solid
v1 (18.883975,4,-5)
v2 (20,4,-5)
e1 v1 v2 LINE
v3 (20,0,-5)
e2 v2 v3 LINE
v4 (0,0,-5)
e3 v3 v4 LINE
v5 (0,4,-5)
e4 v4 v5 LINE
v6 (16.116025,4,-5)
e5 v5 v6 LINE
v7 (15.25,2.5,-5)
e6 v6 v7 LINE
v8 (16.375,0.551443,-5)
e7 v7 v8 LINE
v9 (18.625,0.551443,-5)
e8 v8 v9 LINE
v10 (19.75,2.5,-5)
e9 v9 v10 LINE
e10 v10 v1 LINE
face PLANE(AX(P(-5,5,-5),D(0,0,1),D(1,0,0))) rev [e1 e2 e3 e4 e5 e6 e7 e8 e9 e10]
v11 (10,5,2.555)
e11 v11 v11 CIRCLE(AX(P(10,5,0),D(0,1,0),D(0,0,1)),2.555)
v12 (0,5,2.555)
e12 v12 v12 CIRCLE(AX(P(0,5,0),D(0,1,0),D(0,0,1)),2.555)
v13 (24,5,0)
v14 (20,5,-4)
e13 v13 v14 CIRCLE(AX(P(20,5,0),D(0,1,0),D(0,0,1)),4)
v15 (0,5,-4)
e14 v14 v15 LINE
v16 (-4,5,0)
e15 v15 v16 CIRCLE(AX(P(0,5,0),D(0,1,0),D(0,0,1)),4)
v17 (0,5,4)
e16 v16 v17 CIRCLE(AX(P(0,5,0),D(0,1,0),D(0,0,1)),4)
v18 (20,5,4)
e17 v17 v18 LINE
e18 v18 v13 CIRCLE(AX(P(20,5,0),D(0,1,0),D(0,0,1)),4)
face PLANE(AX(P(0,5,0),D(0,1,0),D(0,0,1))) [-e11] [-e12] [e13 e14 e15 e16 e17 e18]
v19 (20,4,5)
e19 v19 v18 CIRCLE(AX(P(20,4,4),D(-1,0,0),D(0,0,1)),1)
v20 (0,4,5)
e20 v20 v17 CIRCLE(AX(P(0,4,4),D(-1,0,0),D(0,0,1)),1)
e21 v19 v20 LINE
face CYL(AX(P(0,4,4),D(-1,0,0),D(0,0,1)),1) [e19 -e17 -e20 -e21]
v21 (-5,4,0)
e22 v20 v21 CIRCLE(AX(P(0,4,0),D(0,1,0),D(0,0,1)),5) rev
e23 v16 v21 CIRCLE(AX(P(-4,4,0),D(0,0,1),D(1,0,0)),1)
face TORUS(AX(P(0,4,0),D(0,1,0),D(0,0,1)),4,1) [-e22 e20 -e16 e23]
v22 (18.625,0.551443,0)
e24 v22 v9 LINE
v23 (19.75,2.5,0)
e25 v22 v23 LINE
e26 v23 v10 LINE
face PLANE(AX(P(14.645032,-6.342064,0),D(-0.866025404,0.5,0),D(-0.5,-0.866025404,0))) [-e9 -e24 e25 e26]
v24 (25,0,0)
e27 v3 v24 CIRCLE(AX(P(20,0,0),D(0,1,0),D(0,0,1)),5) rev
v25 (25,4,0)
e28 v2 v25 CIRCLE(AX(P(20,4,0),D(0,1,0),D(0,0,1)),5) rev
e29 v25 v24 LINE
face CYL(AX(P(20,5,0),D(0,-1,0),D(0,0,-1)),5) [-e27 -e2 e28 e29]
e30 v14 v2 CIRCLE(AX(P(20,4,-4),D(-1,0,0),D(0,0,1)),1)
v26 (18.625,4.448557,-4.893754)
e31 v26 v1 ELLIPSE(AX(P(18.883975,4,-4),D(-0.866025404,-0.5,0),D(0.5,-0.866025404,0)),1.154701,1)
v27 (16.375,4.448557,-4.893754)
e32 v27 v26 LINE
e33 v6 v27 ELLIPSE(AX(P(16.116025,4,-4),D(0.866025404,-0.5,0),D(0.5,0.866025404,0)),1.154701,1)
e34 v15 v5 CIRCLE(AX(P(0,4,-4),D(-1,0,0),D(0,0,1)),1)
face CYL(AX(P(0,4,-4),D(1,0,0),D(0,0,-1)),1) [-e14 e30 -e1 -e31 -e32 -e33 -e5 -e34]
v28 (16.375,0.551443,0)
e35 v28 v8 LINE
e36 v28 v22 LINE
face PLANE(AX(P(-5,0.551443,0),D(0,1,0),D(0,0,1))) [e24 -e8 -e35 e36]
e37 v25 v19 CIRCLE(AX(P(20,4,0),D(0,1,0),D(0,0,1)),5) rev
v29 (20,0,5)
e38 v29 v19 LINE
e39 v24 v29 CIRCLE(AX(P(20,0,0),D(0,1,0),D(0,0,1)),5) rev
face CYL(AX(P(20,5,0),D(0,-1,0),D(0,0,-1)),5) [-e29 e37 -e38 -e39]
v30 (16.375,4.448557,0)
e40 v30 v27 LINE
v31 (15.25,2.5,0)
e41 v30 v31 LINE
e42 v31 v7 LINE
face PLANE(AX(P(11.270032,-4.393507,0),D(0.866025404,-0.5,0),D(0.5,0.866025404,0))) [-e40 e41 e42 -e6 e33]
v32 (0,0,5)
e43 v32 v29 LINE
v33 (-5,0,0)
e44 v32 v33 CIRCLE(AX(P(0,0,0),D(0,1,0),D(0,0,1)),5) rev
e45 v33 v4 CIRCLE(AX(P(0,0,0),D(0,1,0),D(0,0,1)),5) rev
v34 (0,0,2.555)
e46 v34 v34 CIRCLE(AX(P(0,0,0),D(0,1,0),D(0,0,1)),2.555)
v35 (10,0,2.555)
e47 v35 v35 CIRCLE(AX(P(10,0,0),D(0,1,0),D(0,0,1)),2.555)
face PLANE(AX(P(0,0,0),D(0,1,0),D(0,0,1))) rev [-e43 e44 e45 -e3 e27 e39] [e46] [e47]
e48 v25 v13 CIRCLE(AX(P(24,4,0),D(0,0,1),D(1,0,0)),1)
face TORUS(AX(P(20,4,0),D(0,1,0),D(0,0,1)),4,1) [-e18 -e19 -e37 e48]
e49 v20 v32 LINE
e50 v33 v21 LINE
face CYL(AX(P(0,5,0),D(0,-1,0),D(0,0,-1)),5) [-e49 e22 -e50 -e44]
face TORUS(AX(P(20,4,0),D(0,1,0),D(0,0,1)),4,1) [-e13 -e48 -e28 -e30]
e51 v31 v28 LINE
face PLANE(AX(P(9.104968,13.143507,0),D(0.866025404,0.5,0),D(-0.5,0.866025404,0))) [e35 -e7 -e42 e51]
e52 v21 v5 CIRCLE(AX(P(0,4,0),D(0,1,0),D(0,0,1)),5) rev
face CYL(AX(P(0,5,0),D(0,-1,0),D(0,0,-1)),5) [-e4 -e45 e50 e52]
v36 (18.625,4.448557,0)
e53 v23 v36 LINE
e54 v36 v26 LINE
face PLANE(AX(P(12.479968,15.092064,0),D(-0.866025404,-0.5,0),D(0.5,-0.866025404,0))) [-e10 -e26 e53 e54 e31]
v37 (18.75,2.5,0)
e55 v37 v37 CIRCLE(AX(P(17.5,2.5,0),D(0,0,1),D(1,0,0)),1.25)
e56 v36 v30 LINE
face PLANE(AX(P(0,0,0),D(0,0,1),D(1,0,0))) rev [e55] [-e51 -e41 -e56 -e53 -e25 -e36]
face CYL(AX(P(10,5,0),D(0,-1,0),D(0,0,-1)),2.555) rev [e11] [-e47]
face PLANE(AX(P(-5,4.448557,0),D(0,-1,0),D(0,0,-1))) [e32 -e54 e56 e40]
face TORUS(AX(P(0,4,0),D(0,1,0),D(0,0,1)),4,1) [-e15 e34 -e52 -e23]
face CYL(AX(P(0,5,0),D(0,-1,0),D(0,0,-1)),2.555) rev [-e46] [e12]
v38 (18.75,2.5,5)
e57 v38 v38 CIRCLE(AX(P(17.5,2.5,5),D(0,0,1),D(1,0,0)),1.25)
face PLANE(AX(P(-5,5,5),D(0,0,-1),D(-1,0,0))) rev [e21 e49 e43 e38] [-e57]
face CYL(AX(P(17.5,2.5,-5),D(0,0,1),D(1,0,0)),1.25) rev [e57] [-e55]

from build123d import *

# Parameters (mm, degrees)
SKETCH1_W           = 30
SKETCH1_H           = 10
SKETCH1_R           = 2.555
BOSS_EXTRUDE1_DEPTH = 5
SKETCH2_R           = 1.25
CUT_EXTRUDE1_DEPTH  = 28.386127875
CUT_EXTRUDE2_START  = -5
SKETCH2_3_R         = 1.25
CUT_EXTRUDE2_DEPTH  = 5
FILLET1_R           = 5
FILLET2_R           = 1


# Some blends are built 0.0001 mm under size
with BuildPart() as part:
    # Sketch1 → Boss-Extrude1 (new body)
    with BuildSketch(Plane(origin=(0, 0, 0), x_dir=(1, 0, 0), z_dir=(0, 1, 0))):
        with Locations((10, 0)):
            Rectangle(SKETCH1_W, SKETCH1_H)
        with Locations(Location((0, 0, 0), (0, 0, 270))):
            Circle(SKETCH1_R, mode=Mode.SUBTRACT)
        with Locations(Location((10, 0, 0), (0, 0, 270))):
            Circle(SKETCH1_R, mode=Mode.SUBTRACT)
    extrude(amount=BOSS_EXTRUDE1_DEPTH)

    # Sketch2 → Cut-Extrude1 (cut, through all)
    with BuildSketch(Plane.XY.offset(5)):
        with Locations((17.5, 2.5)):
            Circle(SKETCH2_R)
    extrude(amount=-CUT_EXTRUDE1_DEPTH, mode=Mode.SUBTRACT)

    # Sketch2<3> → Cut-Extrude2 (cut)
    with BuildSketch(Plane.XY.offset(5).offset(CUT_EXTRUDE2_START)):
        Polygon((18.625, 4.448557159), (16.375, 4.448557159), (15.25, 2.5), (16.375, 0.551442841), (18.625, 0.551442841), (19.75, 2.5), align=None)
        with Locations((17.5, 2.5)):
            Circle(SKETCH2_3_R, mode=Mode.SUBTRACT)
    extrude(amount=-CUT_EXTRUDE2_DEPTH, mode=Mode.SUBTRACT)

    # Fillet1
    fillet1_edges = [part.edges().sort_by_distance(p)[0] for p in [
        (-5, 2.5, -5),
        (-5, 2.5, 5),
        (25, 2.5, -5),
        (25, 2.5, 5),
    ]]
    fillet(fillet1_edges, radius=FILLET1_R - 0.0001)  # a hair under: the kernel refuses the full size

    # Fillet2
    # the kernel refuses this fillet: 1 mm, written as the material it takes off along each edge
    with BuildSketch(Plane(origin=(-0.0001, 5, 0.0001), x_dir=(-1, 0, 0), z_dir=(0, 0, -1))) as fillet2_piece_1:
        with BuildLine():
            CenterArc((4.9999 - FILLET2_R, -FILLET2_R), FILLET2_R, 0, 90)
            Line((4.9999, -FILLET2_R), (4.9999, 0))
            Line((4.9999, 0), (4.9999 - FILLET2_R, 0))
        make_face()
    revolve(axis=Axis((-0.0001, 5, 0.0001), (0, 1, 0)), revolution_arc=90, mode=Mode.SUBTRACT)
    with BuildSketch(Plane(origin=(-0.0001, 5, -0.0001), x_dir=(0, 0, -1), z_dir=(1, 0, 0))) as fillet2_piece_2:
        with BuildLine():
            CenterArc((4.9999 - FILLET2_R, -FILLET2_R), FILLET2_R, 0, 90)
            Line((4.9999 - FILLET2_R, 0), (4.9999, 0))
            Line((4.9999, 0), (4.9999, -FILLET2_R))
        make_face()
    revolve(axis=Axis((-0.0001, 5, -0.0001), (0, 1, 0)), revolution_arc=90, mode=Mode.SUBTRACT)
    with BuildSketch(Plane(origin=(-0.0001, 5, -5), x_dir=(0, -1, 0), z_dir=(1, 0, 0))) as fillet2_piece_3:
        with BuildLine():
            CenterArc((FILLET2_R, -FILLET2_R), FILLET2_R, 90, 90)
            Line((0, -FILLET2_R), (0, 0))
            Line((0, 0), (FILLET2_R, 0))
        make_face()
    extrude(amount=20.0002, mode=Mode.SUBTRACT)
    with BuildSketch(Plane(origin=(20.0001, 5, -0.0001), x_dir=(0, 0, -1), z_dir=(-1, 0, 0))) as fillet2_piece_4:
        with BuildLine():
            CenterArc((4.9999 - FILLET2_R, FILLET2_R), FILLET2_R, 270, 90)
            Line((4.9999 - FILLET2_R, 0), (4.9999, 0))
            Line((4.9999, 0), (4.9999, FILLET2_R))
        make_face()
    revolve(axis=Axis((20.0001, 5, -0.0001), (0, -1, 0)), revolution_arc=90, mode=Mode.SUBTRACT)
    with BuildSketch(Plane(origin=(20.0001, 5, 0.0001), x_dir=(1, 0, 0), z_dir=(0, 0, -1))) as fillet2_piece_5:
        with BuildLine():
            CenterArc((4.9999 - FILLET2_R, FILLET2_R), FILLET2_R, 270, 90)
            Line((4.9999, FILLET2_R), (4.9999, 0))
            Line((4.9999, 0), (4.9999 - FILLET2_R, 0))
        make_face()
    revolve(axis=Axis((20.0001, 5, 0.0001), (0, -1, 0)), revolution_arc=90, mode=Mode.SUBTRACT)
    with BuildSketch(Plane(origin=(20.0001, 5, 5), x_dir=(0, 0, -1), z_dir=(-1, 0, 0))) as fillet2_piece_6:
        with BuildLine():
            CenterArc((FILLET2_R, FILLET2_R), FILLET2_R, 180, 90)
            Line((0, FILLET2_R), (0, 0))
            Line((0, 0), (FILLET2_R, 0))
        make_face()
    extrude(amount=20.0002, mode=Mode.SUBTRACT)
    with BuildSketch(Plane(origin=(25, 5, -0.0001), x_dir=(-1, 0, 0), z_dir=(0, 0, 1)), Plane(origin=(-5, 5, 0.0001), x_dir=(1, 0, 0), z_dir=(0, 0, -1))) as fillet2_piece_7:
        with BuildLine():
            CenterArc((FILLET2_R, FILLET2_R), FILLET2_R, 180, 90)
            Line((0, FILLET2_R), (0, 0))
            Line((0, 0), (FILLET2_R, 0))
        make_face()
    extrude(amount=0.0002, mode=Mode.SUBTRACT)


solid = part.part
